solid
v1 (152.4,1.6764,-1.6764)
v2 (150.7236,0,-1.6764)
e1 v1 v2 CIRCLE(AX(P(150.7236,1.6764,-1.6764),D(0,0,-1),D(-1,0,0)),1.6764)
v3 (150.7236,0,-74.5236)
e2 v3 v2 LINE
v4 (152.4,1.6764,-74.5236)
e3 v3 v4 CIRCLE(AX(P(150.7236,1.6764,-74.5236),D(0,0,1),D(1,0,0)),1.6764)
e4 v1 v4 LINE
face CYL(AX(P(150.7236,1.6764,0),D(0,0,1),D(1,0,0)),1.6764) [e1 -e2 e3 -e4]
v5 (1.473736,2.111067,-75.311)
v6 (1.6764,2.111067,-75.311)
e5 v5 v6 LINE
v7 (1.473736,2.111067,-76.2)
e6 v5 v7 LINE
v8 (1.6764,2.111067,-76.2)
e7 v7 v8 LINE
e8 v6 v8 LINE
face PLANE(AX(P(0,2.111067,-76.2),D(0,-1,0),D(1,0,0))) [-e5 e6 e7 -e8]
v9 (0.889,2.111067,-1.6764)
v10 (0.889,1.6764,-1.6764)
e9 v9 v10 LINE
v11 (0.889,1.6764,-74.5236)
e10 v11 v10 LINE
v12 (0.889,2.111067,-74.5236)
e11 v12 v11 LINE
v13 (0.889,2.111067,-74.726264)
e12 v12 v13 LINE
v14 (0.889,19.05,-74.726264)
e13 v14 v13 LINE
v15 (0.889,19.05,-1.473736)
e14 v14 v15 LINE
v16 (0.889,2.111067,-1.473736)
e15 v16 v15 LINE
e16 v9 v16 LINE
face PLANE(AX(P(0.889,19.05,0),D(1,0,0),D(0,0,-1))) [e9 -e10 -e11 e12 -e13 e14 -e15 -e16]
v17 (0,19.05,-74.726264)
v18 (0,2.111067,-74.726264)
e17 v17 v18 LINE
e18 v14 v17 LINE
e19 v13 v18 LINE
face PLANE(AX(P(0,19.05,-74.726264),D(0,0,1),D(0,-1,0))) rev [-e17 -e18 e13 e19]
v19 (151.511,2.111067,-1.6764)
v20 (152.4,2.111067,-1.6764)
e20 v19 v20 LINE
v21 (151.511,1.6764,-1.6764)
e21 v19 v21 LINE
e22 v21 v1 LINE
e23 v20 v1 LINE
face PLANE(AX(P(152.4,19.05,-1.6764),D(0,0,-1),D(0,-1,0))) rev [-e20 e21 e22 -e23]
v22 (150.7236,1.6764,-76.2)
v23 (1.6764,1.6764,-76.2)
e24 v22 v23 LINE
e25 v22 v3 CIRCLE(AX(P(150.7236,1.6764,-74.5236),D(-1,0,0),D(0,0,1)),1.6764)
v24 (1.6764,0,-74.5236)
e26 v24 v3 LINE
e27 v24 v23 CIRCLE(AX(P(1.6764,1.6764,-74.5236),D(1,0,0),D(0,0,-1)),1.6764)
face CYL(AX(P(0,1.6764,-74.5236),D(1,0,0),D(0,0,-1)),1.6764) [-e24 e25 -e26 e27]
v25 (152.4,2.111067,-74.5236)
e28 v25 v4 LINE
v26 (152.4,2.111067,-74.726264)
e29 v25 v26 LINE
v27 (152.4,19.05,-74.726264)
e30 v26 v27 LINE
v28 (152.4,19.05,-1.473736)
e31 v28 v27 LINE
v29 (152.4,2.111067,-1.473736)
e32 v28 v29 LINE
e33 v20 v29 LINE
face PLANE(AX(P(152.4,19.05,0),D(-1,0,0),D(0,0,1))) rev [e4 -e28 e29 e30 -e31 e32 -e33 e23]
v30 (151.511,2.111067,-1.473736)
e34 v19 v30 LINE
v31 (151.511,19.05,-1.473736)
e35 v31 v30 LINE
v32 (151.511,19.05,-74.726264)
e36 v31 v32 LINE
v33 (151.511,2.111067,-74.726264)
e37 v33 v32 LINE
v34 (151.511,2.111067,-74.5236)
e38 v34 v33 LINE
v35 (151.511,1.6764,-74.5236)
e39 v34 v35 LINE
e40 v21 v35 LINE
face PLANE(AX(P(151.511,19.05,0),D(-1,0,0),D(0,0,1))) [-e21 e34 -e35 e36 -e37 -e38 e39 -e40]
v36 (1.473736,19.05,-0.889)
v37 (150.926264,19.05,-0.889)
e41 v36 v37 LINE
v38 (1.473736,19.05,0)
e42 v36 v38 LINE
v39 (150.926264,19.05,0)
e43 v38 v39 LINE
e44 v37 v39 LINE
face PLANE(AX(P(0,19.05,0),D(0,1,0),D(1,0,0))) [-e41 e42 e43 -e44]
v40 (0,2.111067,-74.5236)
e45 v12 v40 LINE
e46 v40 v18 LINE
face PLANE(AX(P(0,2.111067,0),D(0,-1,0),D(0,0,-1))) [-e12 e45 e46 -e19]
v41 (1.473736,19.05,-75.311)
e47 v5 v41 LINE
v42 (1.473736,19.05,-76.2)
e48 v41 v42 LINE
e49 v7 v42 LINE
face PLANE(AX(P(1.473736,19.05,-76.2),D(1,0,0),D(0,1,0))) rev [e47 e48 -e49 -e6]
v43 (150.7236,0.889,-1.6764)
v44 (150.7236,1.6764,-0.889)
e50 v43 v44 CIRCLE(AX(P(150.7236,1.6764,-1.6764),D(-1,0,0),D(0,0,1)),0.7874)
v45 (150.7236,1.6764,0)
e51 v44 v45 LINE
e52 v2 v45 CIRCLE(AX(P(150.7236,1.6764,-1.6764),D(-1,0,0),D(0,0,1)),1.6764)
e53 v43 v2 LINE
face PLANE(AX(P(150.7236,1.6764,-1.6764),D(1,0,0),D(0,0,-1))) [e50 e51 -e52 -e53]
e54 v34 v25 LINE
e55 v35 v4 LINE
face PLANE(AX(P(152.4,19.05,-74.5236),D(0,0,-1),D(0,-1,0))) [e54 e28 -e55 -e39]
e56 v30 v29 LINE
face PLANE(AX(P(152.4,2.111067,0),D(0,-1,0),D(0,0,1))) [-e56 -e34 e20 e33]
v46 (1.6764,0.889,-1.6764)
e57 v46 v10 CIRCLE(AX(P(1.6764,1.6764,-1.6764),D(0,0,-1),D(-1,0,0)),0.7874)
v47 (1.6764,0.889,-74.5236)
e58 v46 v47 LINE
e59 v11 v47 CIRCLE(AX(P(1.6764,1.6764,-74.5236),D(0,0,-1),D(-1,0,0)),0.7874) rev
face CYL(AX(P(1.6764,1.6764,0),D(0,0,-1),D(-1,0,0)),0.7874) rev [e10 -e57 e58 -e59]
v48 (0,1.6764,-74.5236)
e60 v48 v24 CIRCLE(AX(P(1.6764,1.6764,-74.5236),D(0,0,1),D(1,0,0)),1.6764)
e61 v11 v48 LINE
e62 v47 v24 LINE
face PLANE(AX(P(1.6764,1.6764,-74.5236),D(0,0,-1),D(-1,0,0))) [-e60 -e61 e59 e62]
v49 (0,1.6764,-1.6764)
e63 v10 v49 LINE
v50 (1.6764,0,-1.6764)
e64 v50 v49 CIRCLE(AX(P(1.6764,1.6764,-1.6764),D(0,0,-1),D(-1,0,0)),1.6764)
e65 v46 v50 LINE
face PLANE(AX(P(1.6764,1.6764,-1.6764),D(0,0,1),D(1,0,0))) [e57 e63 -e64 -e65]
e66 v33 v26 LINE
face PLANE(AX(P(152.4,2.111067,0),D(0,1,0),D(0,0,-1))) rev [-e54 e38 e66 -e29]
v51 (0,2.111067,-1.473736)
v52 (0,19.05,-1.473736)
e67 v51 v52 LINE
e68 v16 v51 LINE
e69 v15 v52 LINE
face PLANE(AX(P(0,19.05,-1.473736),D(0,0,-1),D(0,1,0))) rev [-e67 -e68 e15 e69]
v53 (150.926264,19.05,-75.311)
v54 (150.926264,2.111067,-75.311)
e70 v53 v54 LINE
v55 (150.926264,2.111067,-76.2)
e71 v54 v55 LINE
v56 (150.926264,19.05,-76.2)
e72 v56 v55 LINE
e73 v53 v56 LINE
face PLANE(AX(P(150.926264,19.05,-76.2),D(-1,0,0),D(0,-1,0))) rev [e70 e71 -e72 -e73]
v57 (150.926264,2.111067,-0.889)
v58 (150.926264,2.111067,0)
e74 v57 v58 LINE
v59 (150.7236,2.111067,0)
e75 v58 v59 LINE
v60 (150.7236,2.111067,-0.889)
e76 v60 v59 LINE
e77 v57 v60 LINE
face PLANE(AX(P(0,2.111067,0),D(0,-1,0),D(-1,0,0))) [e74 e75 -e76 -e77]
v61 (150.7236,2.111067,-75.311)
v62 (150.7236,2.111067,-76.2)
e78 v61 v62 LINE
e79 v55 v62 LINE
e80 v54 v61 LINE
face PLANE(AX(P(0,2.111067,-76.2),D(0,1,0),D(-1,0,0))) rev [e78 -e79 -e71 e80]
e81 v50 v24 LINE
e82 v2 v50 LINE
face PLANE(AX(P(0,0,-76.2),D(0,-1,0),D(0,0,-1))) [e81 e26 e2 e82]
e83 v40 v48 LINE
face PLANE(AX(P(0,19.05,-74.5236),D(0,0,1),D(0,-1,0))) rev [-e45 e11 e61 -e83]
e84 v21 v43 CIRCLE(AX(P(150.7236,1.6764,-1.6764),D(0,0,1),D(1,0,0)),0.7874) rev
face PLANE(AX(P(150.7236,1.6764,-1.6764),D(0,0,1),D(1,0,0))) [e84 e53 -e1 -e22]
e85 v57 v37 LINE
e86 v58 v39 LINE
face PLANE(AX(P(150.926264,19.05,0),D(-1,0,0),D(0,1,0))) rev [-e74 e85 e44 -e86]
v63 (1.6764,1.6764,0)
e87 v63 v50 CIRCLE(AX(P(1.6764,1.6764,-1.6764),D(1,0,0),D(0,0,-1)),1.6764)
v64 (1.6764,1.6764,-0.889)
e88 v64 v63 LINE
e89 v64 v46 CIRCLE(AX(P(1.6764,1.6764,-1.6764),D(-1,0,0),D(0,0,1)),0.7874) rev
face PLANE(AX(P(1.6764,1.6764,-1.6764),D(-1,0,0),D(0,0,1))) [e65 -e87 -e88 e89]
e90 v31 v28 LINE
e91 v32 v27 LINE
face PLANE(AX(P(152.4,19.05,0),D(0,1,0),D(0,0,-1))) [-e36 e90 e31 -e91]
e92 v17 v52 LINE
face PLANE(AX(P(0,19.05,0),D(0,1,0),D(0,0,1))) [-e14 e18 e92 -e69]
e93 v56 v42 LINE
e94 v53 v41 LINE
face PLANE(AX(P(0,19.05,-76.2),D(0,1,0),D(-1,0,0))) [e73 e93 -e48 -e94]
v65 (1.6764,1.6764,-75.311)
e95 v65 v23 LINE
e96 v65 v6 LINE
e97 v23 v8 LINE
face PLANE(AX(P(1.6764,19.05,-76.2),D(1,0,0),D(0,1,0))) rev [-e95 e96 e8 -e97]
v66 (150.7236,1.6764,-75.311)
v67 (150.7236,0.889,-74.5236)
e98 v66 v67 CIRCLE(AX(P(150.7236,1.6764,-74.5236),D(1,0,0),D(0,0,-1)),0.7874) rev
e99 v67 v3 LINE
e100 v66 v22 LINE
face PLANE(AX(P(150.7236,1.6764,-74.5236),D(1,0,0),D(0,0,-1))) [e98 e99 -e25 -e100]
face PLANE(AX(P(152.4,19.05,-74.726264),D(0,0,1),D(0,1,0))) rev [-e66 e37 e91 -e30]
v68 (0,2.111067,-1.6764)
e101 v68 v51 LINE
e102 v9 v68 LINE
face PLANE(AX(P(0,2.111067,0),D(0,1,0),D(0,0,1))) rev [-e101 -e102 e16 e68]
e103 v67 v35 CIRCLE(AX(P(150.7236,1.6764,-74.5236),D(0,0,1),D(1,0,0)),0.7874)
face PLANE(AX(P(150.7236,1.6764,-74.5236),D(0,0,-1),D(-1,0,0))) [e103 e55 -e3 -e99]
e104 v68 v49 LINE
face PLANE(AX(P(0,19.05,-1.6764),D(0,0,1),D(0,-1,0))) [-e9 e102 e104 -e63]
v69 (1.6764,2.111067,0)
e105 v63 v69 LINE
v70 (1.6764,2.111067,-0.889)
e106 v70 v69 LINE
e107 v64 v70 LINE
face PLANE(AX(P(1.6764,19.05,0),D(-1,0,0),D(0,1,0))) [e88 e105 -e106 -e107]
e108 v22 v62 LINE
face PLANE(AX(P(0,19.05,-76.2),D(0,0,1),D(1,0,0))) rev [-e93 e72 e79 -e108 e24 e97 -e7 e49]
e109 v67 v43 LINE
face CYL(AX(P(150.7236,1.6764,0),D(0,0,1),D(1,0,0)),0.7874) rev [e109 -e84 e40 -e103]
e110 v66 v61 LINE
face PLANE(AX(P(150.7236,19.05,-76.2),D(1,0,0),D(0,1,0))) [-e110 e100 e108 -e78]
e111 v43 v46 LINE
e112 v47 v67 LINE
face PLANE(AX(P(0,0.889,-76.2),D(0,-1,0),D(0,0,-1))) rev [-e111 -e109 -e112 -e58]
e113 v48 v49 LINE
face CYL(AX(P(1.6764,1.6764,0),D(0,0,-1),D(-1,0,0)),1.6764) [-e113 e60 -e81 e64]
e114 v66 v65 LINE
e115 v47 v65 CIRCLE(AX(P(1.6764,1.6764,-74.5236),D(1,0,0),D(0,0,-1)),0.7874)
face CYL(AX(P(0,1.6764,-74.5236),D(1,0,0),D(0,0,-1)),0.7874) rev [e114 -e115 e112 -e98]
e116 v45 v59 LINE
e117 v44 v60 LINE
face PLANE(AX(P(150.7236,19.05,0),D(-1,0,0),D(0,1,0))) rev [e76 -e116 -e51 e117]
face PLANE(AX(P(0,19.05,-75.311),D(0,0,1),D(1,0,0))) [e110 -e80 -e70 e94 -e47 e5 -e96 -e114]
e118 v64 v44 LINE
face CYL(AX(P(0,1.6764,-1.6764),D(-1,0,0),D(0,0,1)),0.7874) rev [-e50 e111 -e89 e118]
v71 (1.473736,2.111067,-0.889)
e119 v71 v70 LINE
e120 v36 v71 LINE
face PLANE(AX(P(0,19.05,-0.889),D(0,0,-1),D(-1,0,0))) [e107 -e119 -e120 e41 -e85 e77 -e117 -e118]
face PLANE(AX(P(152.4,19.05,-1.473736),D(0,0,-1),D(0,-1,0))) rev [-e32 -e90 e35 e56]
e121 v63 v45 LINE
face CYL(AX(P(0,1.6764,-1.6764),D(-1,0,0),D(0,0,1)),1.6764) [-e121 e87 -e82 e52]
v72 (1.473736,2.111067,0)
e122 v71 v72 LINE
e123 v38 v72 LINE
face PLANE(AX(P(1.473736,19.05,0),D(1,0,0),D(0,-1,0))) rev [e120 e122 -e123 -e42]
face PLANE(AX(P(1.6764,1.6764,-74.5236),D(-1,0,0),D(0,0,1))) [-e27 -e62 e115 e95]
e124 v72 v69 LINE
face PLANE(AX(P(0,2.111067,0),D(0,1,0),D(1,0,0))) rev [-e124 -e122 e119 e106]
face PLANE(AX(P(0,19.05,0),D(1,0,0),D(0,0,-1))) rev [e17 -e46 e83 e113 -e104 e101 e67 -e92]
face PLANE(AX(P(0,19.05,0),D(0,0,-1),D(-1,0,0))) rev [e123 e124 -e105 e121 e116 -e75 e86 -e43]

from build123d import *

# Parameters (mm, degrees)
SKETCH1_W              = 152.4
SKETCH1_H              = 76.2
BOSS_EXTRUDE1_DEPTH    = 19.05
CONVERT_SOLID1_START   = -74.5236
CONVERT_SOLID1_DEPTH   = 72.8472
CONVERT_SOLID1_START_2 = -77
CONVERT_SOLID1_2_DEPTH = 2.273736392
CONVERT_SOLID1_START_3 = -1.473736392
CONVERT_SOLID1_3_DEPTH = 2.473736392
CONVERT_SOLID1_START_4 = -74.726263608
CONVERT_SOLID1_4_DEPTH = 73.252527216
CONVERT_SOLID1_5_DEPTH = 0.202663608
CONVERT_SOLID1_START_5 = -1.6764
CONVERT_SOLID1_6_DEPTH = 0.202663608
CONVERT_SOLID1_START_6 = 1.473736392
CONVERT_SOLID1_7_DEPTH = 149.452527216


with BuildPart() as part:
    # Sketch1 → Boss-Extrude1 (new body)
    with BuildSketch(Plane(origin=(0, 0, 0), x_dir=(1, 0, 0), z_dir=(0, 1, 0))):
        with Locations((76.2, 38.1)):
            Rectangle(SKETCH1_W, SKETCH1_H)
    extrude(amount=BOSS_EXTRUDE1_DEPTH)

    # Convert-Solid1: read off the stored shape, not the designer's step
    # Convert-Solid1 outline → Convert-Solid1 (cut)
    with BuildSketch(Plane.XY.offset(CONVERT_SOLID1_START)):
        with BuildLine():
            Line((151.511, 19.05), (0.889, 19.05))
            Line((0.889, 19.05), (0.889, 1.6764))
            ThreePointArc((0.889, 1.6764), (1.11962412, 1.11962412), (1.6764, 0.889))
            Line((1.6764, 0.889), (150.7236, 0.889))
            ThreePointArc((150.7236, 0.889), (151.28037588, 1.11962412), (151.511, 1.6764))
            Line((151.511, 1.6764), (151.511, 19.05))
        make_face()
        with BuildLine():
            ThreePointArc((152.4, 1.6764), (151.908993808, 0.491006192), (150.7236, 0))
            Line((150.7236, 0), (152.4, 0))
            Line((152.4, 0), (152.4, 1.6764))
        make_face()
        with BuildLine():
            Line((0, 0), (1.6764, 0))
            ThreePointArc((1.6764, 0), (0.491006192, 0.491006192), (0, 1.6764))
            Line((0, 1.6764), (0, 0))
        make_face()
    extrude(amount=CONVERT_SOLID1_DEPTH, mode=Mode.SUBTRACT)

    # Convert-Solid1 2 outline → Convert-Solid1 2 (cut)
    with BuildSketch(Plane.XY.offset(CONVERT_SOLID1_START_2)):
        Polygon((150.926263608, 2.11106664), (150.7236, 2.11106664), (150.7236, 0), (152.4, 0), (152.4, 19.05), (150.926263608, 19.05), align=None)
        Polygon((1.473736392, 19.05), (0, 19.05), (0, 0), (1.6764, 0), (1.6764, 2.11106664), (1.473736392, 2.11106664), align=None)
    extrude(amount=CONVERT_SOLID1_2_DEPTH, mode=Mode.SUBTRACT)

    # Convert-Solid1 3 outline → Convert-Solid1 3 (cut)
    with BuildSketch(Plane.XY.offset(CONVERT_SOLID1_START_3)):
        Polygon((150.926263608, 2.11106664), (150.7236, 2.11106664), (150.7236, 0), (152.4, 0), (152.4, 19.05), (150.926263608, 19.05), align=None)
        Polygon((1.473736392, 19.05), (0, 19.05), (0, 0), (1.6764, 0), (1.6764, 2.11106664), (1.473736392, 2.11106664), align=None)
    extrude(amount=CONVERT_SOLID1_3_DEPTH, mode=Mode.SUBTRACT)

    # Convert-Solid1 4 outline → Convert-Solid1 4 (cut)
    with BuildSketch(Plane.XY.offset(CONVERT_SOLID1_START_4)):
        with BuildLine():
            Line((150.926263608, 2.11106664), (150.7236, 2.11106664))
            Line((150.7236, 2.11106664), (150.7236, 0.889))
            ThreePointArc((150.7236, 0.889), (151.28037588, 1.11962412), (151.511, 1.6764))
            Line((151.511, 1.6764), (151.511, 19.05))
            Line((151.511, 19.05), (150.926263608, 19.05))
            Line((150.926263608, 19.05), (150.926263608, 2.11106664))
        make_face()
        with BuildLine():
            ThreePointArc((152.4, 1.6764), (151.908993808, 0.491006192), (150.7236, 0))
            Line((150.7236, 0), (152.4, 0))
            Line((152.4, 0), (152.4, 1.6764))
        make_face()
        with BuildLine():
            ThreePointArc((0.889, 1.6764), (1.11962412, 1.11962412), (1.6764, 0.889))
            Line((1.6764, 0.889), (1.6764, 2.11106664))
            Line((1.6764, 2.11106664), (1.473736392, 2.11106664))
            Line((1.473736392, 2.11106664), (1.473736392, 19.05))
            Line((1.473736392, 19.05), (0.889, 19.05))
            Line((0.889, 19.05), (0.889, 1.6764))
        make_face()
        with BuildLine():
            Line((0, 0), (1.6764, 0))
            ThreePointArc((1.6764, 0), (0.491006192, 0.491006192), (0, 1.6764))
            Line((0, 1.6764), (0, 0))
        make_face()
    extrude(amount=CONVERT_SOLID1_4_DEPTH, mode=Mode.SUBTRACT)

    # Convert-Solid1 5 outline → Convert-Solid1 5 (cut)
    with BuildSketch(Plane.XY.offset(CONVERT_SOLID1_START_4)):
        with BuildLine():
            ThreePointArc((151.511, 1.6764), (151.28037588, 1.11962412), (150.7236, 0.889))
            Line((150.7236, 0.889), (150.7236, 0))
            ThreePointArc((150.7236, 0), (151.908993808, 0.491006192), (152.4, 1.6764))
            Line((152.4, 1.6764), (152.4, 2.11106664))
            Line((152.4, 2.11106664), (151.511, 2.11106664))
            Line((151.511, 2.11106664), (151.511, 1.6764))
        make_face()
        with BuildLine():
            Line((1.6764, 0), (1.6764, 0.889))
            ThreePointArc((1.6764, 0.889), (1.11962412, 1.11962412), (0.889, 1.6764))
            Line((0.889, 1.6764), (0.889, 2.11106664))
            Line((0.889, 2.11106664), (0, 2.11106664))
            Line((0, 2.11106664), (0, 1.6764))
            ThreePointArc((0, 1.6764), (0.491006192, 0.491006192), (1.6764, 0))
        make_face()
    extrude(amount=CONVERT_SOLID1_5_DEPTH, mode=Mode.SUBTRACT)

    # Convert-Solid1 6 outline → Convert-Solid1 6 (cut)
    with BuildSketch(Plane.XY.offset(CONVERT_SOLID1_START_5)):
        with BuildLine():
            ThreePointArc((151.511, 1.6764), (151.28037588, 1.11962412), (150.7236, 0.889))
            Line((150.7236, 0.889), (150.7236, 0))
            ThreePointArc((150.7236, 0), (151.908993808, 0.491006192), (152.4, 1.6764))
            Line((152.4, 1.6764), (152.4, 2.11106664))
            Line((152.4, 2.11106664), (151.511, 2.11106664))
            Line((151.511, 2.11106664), (151.511, 1.6764))
        make_face()
        with BuildLine():
            Line((1.6764, 0), (1.6764, 0.889))
            ThreePointArc((1.6764, 0.889), (1.11962412, 1.11962412), (0.889, 1.6764))
            Line((0.889, 1.6764), (0.889, 2.11106664))
            Line((0.889, 2.11106664), (0, 2.11106664))
            Line((0, 2.11106664), (0, 1.6764))
            ThreePointArc((0, 1.6764), (0.491006192, 0.491006192), (1.6764, 0))
        make_face()
    extrude(amount=CONVERT_SOLID1_6_DEPTH, mode=Mode.SUBTRACT)

    # Convert-Solid1 7 outline → Convert-Solid1 7 (cut)
    with BuildSketch(Plane.YZ.offset(CONVERT_SOLID1_START_6)):
        with BuildLine():
            Line((0, 0), (0, -1.6764))
            ThreePointArc((0, -1.6764), (0.491006192, -0.491006192), (1.6764, 0))
            Line((1.6764, 0), (0, 0))
        make_face()
        with BuildLine():
            ThreePointArc((1.6764, -76.2), (0.491006192, -75.708993808), (0, -74.5236))
            Line((0, -74.5236), (0, -76.2))
            Line((0, -76.2), (1.6764, -76.2))
        make_face()
        with BuildLine():
            Line((19.05, -74.5236), (0.889, -74.5236))
            ThreePointArc((0.889, -74.5236), (1.11962412, -75.08037588), (1.6764, -75.311))
            Line((1.6764, -75.311), (19.05, -75.311))
            Line((19.05, -75.311), (19.05, -74.5236))
        make_face()
        with BuildLine():
            Line((0.889, -1.6764), (19.05, -1.6764))
            Line((19.05, -1.6764), (19.05, -0.889))
            Line((19.05, -0.889), (1.6764, -0.889))
            ThreePointArc((1.6764, -0.889), (1.11962412, -1.11962412), (0.889, -1.6764))
        make_face()
    extrude(amount=CONVERT_SOLID1_7_DEPTH, mode=Mode.SUBTRACT)


solid = part.part
